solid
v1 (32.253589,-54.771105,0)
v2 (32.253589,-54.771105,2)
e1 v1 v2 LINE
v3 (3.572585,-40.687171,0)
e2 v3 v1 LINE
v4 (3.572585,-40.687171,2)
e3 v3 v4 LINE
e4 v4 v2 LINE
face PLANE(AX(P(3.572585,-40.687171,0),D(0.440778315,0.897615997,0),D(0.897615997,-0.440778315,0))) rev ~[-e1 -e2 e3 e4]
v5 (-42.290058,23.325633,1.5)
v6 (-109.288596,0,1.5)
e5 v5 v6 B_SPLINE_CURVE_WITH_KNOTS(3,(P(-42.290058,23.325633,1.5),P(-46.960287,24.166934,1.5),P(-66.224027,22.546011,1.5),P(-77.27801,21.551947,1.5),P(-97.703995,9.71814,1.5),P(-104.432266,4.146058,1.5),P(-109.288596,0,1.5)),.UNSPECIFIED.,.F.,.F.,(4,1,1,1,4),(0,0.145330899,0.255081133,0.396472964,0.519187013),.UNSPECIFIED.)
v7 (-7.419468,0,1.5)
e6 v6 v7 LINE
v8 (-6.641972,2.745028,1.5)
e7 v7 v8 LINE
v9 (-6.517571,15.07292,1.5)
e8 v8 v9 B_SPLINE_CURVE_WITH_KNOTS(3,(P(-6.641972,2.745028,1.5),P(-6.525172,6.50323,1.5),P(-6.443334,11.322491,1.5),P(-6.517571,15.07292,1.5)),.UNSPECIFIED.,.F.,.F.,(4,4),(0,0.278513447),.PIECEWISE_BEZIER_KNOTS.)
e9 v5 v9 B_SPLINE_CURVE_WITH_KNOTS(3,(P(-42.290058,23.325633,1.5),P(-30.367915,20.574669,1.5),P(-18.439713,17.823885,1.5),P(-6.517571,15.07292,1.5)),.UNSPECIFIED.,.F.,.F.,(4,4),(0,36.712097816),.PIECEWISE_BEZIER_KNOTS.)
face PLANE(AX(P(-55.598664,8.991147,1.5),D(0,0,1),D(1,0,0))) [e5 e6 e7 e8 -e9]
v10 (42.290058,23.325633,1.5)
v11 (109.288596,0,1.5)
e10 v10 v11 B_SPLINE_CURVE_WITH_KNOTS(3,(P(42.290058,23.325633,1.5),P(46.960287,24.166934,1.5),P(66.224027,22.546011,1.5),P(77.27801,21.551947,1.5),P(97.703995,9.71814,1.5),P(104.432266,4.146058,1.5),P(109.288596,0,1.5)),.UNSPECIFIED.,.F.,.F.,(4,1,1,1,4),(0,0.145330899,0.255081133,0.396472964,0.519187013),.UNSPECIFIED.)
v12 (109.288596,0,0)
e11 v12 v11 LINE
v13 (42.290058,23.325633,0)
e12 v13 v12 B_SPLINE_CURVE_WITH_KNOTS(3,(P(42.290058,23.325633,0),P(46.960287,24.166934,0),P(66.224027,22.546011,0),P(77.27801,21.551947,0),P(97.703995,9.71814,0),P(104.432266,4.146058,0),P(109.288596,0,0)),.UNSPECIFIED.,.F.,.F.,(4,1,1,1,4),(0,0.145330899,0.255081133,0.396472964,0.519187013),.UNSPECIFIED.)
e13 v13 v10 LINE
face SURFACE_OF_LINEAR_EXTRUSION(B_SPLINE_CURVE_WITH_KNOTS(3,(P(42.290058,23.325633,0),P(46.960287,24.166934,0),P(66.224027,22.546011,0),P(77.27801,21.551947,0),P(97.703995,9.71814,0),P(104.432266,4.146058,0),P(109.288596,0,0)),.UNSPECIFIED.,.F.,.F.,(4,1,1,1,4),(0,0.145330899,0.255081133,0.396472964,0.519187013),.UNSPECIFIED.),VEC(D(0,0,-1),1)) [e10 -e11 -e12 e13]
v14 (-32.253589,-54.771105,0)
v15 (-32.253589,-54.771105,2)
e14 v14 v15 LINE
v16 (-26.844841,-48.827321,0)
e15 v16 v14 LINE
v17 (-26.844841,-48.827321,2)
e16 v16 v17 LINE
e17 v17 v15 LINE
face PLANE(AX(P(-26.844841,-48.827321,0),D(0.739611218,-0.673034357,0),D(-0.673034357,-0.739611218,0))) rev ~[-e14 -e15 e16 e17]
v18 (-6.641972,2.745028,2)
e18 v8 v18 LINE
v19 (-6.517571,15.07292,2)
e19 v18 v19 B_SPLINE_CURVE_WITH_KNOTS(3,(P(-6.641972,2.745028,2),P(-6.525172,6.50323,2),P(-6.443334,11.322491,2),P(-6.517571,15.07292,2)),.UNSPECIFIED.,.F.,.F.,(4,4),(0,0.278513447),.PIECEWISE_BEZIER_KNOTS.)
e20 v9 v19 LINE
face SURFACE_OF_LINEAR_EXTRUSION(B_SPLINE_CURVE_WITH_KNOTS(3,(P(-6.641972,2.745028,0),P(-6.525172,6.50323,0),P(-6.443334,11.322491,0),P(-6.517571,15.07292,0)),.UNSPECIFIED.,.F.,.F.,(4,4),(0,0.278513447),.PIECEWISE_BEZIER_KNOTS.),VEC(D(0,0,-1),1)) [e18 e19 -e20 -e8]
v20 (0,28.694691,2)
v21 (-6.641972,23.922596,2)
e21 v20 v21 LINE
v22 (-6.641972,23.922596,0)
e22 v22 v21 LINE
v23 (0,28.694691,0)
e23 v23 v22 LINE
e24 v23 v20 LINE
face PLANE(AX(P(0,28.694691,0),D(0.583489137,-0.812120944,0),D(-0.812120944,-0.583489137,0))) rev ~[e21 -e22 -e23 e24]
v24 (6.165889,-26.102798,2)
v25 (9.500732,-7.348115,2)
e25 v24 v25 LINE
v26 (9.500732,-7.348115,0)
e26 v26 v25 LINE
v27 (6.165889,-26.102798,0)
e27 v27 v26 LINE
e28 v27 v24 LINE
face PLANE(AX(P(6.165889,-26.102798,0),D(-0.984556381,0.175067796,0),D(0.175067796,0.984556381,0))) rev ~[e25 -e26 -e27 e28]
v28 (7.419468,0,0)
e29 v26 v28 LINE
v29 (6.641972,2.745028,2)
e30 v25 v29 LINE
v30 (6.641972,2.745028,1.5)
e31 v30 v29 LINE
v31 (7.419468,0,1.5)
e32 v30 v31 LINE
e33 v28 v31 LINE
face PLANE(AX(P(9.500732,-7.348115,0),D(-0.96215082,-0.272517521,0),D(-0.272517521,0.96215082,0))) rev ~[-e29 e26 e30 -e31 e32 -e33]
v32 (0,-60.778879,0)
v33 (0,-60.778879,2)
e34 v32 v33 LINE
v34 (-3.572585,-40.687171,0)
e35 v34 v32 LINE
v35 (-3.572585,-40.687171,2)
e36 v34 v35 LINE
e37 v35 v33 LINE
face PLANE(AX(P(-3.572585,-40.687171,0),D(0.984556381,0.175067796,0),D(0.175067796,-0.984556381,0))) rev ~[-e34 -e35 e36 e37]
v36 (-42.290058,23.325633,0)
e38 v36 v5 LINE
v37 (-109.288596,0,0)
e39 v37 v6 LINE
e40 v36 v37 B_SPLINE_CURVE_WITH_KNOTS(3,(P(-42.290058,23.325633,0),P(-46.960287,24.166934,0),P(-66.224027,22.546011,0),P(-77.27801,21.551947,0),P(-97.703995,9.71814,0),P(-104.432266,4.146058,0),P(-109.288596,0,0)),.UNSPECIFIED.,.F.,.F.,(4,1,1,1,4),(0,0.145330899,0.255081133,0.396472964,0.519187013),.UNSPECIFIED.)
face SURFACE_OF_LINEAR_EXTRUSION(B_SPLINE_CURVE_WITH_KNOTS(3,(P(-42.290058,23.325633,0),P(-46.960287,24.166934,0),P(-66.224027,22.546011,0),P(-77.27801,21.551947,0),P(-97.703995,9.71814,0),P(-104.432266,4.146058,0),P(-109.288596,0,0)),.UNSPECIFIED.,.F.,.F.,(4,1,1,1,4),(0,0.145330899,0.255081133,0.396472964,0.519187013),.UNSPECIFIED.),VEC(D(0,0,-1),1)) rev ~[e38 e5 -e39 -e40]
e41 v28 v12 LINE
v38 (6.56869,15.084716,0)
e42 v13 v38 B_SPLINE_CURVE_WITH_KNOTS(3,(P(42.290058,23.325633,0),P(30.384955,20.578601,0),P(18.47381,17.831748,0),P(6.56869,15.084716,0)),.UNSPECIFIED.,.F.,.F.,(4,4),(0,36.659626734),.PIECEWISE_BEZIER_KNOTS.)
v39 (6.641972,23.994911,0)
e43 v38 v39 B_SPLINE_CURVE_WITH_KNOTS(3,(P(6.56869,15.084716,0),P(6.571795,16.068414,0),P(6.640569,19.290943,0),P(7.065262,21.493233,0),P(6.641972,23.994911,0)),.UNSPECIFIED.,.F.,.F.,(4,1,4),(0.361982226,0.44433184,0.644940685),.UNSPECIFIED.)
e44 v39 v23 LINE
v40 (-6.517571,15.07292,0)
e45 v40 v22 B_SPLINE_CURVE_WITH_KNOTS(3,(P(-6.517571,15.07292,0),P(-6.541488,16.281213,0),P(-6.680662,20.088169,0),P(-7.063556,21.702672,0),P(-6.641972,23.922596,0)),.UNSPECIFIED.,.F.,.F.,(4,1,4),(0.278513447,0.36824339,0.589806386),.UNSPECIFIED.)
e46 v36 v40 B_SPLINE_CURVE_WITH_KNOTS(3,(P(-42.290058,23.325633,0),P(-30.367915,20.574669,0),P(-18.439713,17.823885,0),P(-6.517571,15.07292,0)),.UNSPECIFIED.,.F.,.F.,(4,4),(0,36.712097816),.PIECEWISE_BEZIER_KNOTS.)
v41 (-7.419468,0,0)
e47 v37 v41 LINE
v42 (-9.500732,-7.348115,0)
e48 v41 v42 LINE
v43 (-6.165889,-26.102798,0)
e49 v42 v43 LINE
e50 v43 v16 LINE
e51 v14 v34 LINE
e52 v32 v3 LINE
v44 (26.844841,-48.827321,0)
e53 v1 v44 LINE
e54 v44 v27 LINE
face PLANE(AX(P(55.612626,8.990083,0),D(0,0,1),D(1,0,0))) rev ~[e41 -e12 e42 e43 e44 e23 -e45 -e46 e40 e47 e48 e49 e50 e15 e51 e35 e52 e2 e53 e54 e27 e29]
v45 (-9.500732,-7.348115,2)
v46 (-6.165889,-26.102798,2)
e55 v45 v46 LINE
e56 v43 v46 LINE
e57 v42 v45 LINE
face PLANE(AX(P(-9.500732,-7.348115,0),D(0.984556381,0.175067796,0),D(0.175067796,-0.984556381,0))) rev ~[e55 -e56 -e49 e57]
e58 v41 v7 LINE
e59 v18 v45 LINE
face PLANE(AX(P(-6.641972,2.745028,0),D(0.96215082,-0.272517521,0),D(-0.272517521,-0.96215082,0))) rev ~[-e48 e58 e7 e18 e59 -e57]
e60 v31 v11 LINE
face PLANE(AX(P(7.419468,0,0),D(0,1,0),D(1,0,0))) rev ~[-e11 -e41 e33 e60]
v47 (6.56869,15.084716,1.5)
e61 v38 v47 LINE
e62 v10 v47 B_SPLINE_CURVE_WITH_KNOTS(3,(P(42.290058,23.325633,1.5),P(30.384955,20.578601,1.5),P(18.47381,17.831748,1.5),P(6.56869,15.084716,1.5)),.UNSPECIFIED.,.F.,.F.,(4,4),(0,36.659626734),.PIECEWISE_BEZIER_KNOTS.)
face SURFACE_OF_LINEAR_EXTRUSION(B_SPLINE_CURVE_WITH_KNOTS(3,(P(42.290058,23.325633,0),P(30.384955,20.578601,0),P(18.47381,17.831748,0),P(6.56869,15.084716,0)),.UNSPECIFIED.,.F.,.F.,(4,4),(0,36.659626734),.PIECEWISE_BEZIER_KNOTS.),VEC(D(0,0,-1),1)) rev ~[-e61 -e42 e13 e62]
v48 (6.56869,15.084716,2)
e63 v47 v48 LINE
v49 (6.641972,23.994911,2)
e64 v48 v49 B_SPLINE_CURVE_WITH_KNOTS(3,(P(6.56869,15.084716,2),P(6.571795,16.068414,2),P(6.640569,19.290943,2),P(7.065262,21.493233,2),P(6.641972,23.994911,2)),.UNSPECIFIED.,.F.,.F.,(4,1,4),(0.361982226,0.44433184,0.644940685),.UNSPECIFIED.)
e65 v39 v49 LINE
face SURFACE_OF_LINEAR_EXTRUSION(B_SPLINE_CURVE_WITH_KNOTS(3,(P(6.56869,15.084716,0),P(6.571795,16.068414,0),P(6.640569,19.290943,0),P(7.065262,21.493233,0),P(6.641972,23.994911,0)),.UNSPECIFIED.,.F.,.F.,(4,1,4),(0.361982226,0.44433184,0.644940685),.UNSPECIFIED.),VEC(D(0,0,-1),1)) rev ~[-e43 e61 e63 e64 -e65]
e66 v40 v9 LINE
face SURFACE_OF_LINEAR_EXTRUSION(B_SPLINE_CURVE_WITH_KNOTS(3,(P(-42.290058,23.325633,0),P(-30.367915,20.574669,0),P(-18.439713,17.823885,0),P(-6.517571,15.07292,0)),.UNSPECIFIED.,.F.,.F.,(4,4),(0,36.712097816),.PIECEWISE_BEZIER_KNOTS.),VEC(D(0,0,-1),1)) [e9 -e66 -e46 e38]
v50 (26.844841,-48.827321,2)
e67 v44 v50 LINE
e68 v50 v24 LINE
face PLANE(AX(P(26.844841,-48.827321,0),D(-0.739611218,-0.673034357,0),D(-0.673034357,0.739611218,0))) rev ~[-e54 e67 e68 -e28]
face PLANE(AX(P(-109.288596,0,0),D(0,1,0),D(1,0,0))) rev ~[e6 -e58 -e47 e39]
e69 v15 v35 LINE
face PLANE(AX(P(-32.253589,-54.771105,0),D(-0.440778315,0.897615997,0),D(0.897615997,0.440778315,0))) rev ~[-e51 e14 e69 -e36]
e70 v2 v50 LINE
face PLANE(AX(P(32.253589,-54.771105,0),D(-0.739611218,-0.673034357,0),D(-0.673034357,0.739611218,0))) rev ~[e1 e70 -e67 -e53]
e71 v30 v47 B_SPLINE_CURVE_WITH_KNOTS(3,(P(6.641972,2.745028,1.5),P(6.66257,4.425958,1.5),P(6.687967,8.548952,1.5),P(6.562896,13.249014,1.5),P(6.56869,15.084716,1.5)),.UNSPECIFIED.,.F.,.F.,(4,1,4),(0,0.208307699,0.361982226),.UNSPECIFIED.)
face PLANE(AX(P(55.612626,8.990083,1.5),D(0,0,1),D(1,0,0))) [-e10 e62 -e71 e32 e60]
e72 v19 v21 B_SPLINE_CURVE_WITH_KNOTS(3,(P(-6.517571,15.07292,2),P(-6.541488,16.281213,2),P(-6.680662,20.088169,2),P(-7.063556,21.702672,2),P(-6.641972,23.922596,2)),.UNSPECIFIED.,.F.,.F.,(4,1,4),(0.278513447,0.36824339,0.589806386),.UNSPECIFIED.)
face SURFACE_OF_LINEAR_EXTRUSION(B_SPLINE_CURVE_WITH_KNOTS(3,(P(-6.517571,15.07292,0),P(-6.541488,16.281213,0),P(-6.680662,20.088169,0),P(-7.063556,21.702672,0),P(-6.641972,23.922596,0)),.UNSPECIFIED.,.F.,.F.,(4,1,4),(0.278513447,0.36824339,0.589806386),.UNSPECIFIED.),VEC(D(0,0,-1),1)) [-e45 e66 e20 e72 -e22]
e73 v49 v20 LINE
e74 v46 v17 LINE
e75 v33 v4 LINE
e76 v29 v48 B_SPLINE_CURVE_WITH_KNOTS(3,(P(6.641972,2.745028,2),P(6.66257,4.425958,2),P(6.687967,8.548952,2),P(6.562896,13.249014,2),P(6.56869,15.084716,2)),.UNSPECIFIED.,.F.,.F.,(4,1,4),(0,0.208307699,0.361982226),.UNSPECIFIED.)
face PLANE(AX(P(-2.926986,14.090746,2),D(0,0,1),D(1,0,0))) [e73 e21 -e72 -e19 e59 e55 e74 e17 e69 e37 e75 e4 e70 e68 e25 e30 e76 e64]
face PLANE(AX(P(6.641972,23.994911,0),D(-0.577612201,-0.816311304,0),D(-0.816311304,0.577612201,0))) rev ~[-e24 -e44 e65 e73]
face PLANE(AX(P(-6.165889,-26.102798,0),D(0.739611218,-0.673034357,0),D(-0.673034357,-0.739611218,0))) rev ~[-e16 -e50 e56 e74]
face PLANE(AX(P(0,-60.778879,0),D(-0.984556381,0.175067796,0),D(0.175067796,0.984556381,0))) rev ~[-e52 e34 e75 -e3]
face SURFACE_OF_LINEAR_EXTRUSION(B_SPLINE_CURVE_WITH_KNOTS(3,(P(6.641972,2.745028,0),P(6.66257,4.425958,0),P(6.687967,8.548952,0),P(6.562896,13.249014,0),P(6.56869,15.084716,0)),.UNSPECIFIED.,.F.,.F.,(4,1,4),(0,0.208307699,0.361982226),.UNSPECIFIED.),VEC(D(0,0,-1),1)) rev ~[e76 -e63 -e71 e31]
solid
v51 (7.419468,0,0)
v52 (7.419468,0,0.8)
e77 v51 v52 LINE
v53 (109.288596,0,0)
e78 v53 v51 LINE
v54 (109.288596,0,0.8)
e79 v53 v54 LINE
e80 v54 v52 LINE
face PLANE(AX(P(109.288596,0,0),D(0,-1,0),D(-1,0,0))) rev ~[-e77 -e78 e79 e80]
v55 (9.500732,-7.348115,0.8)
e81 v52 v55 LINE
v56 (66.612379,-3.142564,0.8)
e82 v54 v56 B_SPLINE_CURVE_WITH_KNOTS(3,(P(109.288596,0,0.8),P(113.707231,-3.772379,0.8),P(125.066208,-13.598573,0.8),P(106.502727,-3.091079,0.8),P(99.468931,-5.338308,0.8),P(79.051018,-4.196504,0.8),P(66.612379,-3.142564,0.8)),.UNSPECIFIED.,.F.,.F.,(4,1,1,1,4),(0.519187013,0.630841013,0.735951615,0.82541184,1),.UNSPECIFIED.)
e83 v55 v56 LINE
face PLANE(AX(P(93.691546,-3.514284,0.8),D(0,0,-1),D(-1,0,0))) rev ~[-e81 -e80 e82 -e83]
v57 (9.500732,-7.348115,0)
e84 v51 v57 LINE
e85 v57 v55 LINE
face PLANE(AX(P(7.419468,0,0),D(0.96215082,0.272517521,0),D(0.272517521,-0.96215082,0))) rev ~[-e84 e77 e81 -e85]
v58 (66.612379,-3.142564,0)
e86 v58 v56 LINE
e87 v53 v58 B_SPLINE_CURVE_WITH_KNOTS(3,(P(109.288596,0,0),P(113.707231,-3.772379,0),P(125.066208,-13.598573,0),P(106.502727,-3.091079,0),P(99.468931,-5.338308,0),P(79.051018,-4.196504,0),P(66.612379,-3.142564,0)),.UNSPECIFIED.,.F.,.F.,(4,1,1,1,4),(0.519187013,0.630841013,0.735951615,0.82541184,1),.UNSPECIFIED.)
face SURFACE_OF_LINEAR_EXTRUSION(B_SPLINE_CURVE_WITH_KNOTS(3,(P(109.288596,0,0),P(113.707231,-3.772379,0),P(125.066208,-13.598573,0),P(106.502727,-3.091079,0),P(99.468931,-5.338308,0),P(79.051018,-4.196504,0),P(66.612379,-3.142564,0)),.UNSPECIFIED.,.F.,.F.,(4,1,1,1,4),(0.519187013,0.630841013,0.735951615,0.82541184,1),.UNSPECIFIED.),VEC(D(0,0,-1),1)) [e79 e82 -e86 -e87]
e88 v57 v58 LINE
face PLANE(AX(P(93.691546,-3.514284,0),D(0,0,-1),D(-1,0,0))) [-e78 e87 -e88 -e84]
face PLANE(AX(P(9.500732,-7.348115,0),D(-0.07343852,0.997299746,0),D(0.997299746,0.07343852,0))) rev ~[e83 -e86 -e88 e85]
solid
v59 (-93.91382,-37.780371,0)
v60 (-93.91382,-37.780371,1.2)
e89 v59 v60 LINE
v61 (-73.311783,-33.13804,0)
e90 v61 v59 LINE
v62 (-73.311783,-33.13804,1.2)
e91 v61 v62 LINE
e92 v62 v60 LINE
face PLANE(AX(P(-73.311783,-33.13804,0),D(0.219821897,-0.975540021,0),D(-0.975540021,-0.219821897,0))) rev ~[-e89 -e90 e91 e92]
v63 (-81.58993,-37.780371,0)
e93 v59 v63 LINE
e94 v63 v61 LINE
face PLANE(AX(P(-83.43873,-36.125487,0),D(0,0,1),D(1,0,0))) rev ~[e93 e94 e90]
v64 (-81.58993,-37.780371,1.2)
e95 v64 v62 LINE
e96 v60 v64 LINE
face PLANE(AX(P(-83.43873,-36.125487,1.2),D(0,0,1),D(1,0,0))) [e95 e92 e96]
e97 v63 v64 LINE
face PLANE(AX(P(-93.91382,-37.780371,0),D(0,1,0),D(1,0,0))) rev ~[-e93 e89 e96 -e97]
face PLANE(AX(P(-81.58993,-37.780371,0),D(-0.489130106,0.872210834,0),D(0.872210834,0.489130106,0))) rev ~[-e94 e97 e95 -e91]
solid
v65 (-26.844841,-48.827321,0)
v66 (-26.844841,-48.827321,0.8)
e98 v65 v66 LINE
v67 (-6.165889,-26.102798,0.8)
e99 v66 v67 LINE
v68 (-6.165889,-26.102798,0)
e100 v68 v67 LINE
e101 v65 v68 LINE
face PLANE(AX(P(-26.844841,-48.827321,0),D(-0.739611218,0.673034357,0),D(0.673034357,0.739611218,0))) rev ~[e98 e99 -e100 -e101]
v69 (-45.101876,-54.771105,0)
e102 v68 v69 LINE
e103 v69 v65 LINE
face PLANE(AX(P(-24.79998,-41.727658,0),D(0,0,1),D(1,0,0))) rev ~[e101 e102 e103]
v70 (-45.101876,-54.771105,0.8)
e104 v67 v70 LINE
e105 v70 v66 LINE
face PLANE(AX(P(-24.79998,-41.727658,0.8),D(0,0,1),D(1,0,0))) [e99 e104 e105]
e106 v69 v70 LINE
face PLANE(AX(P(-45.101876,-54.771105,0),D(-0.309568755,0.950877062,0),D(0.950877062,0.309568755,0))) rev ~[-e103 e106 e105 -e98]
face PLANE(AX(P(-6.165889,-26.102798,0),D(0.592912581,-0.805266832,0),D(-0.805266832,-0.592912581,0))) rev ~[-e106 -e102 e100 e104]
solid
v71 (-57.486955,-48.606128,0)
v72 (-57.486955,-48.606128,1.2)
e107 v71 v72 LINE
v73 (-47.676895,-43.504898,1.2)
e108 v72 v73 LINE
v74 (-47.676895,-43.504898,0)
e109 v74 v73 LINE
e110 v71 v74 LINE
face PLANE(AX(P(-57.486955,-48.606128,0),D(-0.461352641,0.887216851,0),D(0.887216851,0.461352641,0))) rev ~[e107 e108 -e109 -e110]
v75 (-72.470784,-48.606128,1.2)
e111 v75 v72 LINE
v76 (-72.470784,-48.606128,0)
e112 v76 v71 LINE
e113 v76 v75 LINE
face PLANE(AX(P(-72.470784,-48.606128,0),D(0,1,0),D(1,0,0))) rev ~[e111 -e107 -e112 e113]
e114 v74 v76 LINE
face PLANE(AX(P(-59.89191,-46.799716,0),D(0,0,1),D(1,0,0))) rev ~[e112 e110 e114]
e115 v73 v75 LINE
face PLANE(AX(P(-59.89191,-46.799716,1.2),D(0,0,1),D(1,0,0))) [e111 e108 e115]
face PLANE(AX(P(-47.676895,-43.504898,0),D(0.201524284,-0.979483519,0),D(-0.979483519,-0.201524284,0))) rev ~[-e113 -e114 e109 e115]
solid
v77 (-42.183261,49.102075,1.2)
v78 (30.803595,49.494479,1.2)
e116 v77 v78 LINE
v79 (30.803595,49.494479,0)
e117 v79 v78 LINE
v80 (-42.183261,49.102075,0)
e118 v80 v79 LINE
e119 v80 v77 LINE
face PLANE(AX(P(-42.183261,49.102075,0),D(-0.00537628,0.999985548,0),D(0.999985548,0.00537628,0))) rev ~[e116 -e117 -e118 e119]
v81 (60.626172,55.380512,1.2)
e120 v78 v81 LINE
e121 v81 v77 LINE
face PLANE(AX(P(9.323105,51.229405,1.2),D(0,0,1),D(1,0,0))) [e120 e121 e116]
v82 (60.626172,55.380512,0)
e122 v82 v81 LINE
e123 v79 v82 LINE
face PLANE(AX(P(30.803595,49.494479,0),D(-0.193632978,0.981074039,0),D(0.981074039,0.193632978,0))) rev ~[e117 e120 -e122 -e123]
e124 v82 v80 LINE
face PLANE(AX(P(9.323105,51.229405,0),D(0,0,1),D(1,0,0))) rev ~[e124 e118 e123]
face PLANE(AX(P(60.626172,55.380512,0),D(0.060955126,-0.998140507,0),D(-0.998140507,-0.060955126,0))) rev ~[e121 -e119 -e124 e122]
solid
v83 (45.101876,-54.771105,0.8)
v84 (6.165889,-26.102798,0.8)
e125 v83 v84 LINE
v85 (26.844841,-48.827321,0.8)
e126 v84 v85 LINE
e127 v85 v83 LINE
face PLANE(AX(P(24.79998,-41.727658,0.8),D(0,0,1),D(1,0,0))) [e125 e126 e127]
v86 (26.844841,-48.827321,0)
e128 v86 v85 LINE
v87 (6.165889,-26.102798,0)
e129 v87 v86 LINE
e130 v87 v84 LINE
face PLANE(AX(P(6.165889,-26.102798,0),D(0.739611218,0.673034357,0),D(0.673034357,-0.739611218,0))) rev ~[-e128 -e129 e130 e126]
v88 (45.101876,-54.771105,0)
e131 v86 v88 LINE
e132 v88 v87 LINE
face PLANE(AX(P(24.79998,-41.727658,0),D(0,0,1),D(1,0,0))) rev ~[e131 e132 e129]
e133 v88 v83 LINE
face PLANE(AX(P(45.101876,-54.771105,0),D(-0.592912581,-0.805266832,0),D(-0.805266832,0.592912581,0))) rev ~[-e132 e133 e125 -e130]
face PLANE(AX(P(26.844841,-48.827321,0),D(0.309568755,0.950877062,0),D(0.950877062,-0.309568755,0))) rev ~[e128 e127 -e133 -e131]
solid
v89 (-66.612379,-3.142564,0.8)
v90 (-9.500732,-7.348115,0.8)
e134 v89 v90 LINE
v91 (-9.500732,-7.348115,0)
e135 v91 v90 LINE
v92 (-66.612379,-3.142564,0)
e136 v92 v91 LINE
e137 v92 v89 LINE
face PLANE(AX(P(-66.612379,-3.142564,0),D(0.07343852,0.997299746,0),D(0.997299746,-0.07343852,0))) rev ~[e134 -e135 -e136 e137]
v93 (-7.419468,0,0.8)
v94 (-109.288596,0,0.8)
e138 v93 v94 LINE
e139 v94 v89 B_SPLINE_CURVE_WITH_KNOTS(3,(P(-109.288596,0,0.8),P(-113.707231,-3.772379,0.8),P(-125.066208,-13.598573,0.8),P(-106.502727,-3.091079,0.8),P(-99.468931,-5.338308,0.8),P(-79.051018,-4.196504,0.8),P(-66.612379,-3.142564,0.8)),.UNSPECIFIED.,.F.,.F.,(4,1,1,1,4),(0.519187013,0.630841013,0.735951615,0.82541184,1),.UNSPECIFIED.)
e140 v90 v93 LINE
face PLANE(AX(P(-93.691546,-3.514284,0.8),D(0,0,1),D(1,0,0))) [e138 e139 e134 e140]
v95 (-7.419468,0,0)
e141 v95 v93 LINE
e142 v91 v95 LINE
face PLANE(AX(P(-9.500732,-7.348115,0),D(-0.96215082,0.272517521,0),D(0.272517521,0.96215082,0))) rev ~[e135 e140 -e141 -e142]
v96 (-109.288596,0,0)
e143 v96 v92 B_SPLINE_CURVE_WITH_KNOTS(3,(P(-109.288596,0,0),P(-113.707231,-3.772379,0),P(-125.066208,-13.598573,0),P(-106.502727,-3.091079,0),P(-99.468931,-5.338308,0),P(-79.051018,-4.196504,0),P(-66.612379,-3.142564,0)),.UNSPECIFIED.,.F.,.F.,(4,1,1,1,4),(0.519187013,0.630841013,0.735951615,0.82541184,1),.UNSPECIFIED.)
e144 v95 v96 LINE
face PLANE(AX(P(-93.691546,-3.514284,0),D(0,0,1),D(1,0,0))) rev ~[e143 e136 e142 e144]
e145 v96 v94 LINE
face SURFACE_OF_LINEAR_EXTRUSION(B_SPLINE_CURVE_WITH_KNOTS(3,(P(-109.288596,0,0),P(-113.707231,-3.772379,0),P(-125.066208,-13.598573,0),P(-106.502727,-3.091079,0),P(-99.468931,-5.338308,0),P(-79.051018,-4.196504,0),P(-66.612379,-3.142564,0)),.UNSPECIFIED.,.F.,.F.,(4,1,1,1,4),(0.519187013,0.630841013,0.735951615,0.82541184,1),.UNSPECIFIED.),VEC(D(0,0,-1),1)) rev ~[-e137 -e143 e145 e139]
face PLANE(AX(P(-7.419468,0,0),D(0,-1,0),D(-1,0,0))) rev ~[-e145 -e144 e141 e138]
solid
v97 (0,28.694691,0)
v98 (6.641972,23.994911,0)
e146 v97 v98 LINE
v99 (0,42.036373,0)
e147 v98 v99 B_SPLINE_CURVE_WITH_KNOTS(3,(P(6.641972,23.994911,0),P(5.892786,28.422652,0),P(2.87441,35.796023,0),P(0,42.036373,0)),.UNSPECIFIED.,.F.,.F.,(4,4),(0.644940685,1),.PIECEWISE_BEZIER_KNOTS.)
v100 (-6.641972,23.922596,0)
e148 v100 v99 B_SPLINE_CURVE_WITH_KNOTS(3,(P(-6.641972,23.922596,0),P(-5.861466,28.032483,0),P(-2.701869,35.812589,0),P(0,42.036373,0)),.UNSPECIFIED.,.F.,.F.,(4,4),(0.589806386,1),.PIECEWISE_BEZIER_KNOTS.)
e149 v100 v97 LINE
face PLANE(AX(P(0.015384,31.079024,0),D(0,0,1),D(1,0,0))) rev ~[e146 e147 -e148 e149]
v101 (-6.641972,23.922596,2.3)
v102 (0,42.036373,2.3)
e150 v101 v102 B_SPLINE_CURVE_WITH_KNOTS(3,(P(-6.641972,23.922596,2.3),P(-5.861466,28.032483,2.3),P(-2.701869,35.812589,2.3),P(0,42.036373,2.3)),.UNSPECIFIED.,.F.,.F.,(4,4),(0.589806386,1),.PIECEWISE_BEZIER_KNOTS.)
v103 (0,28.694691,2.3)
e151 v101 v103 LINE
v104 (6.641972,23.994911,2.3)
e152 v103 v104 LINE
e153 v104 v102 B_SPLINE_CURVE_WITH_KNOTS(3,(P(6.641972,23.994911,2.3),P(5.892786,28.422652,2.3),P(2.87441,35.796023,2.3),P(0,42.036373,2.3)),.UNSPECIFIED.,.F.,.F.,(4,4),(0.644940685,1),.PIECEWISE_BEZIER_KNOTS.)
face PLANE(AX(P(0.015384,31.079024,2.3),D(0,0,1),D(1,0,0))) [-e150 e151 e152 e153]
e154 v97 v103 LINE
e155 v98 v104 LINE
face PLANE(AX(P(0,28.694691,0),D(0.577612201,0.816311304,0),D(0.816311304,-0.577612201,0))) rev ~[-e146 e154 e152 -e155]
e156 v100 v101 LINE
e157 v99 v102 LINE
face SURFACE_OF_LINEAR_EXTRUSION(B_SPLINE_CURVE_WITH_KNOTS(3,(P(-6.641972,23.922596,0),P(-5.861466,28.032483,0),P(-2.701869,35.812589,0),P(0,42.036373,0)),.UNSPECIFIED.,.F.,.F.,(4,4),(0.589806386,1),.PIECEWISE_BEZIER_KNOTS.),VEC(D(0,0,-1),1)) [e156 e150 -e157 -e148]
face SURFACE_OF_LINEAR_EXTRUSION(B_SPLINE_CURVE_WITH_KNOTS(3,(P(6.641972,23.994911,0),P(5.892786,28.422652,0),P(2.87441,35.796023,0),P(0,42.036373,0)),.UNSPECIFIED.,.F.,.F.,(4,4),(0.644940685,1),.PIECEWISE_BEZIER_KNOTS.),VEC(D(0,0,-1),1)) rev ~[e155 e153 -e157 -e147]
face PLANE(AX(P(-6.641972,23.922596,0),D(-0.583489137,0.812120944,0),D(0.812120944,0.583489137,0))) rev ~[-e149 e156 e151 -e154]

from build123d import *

# Parameters (mm, degrees)
F1_DEPTH = 2
F2_DEPTH = 2.3
F3_DEPTH = 1.5
F4_DEPTH = 0.8
F5_DEPTH = 1.2


# Not quite as in the source:
# - a feature names something its author has since deleted; it is built from what else it names


with BuildPart() as f1:
    # F0 (on Top) → F1 (new body)
    with BuildSketch(Plane.XY):
        with BuildLine():
            Line((-6.6419716499, 2.745028284), (0, 0))
            Line((0, 0), (0, 28.6946911365))
            Line((0, 28.6946911365), (-6.6419716499, 23.9225961235))
            add(Edge.make_bspline(
                [(-6.5175706139, 15.0729201773), (-6.5414876506, 16.2812130784), (-6.6806623081, 20.0881688925), (-7.0635559844, 21.7026716796), (-6.6419716499, 23.9225961235)],
                knots=[0.2785134471, 0.2785134471, 0.2785134471, 0.2785134471, 0.3682433903, 0.5898063865, 0.5898063865, 0.5898063865, 0.5898063865], degree=3))
            add(Edge.make_bspline(
                [(-6.6419716499, 2.745028284), (-6.5251722943, 6.5032297687), (-6.4433343436, 11.3224907311), (-6.5175706139, 15.0729201773)],
                knots=[0, 0, 0, 0, 0.2785134471, 0.2785134471, 0.2785134471, 0.2785134471], degree=3))
        make_face()
        with BuildLine():
            Line((0, 28.6946911365), (0, 0))
            Line((0, 0), (6.6419716499, 2.745028284))
            add(Edge.make_bspline(
                [(6.6419716499, 2.745028284), (6.6625704877, 4.4259580865), (6.6879671442, 8.5489520633), (6.5628964948, 13.2490139748), (6.5686901265, 15.0847156957)],
                knots=[0, 0, 0, 0, 0.2083076988, 0.3619822263, 0.3619822263, 0.3619822263, 0.3619822263], degree=3))
            add(Edge.make_bspline(
                [(6.5686901265, 15.0847156957), (6.5717947616, 16.0684137089), (6.6405692543, 19.2909426976), (7.065262223, 21.4932328604), (6.6419716499, 23.9949107423)],
                knots=[0.3619822263, 0.3619822263, 0.3619822263, 0.3619822263, 0.4443318399, 0.644940685, 0.644940685, 0.644940685, 0.644940685], degree=3))
            Line((6.6419716499, 23.9949107423), (0, 28.6946911365))
        make_face()
        Polygon((9.5007317222, -7.3481148503), (0, -8.0477236517), (0, -38.9328375459), (3.5725845946, -40.6871710497), (6.1658886261, -26.1027980596), align=None)
        Polygon((0, -38.9328375459), (0, -8.0477236517), (-9.5007317222, -7.3481148503), (-6.1658886261, -26.1027980596), (-3.5725845946, -40.6871710497), align=None)
        Polygon((-32.2535888602, -54.7711053479), (-3.5725845946, -40.6871710497), (-6.1658886261, -26.1027980596), (-26.8448407595, -48.8273214495), align=None)
        Polygon((26.8448407595, -48.8273214495), (6.1658886261, -26.1027980596), (3.5725845946, -40.6871710497), (32.2535888602, -54.7711053479), align=None)
        Polygon((0, -8.0477236517), (0, 0), (-7.4194675351, 0), (-9.5007317222, -7.3481148503), align=None)
        Polygon((7.4194675351, 0), (0, 0), (0, -8.0477236517), (9.5007317222, -7.3481148503), align=None)
        Polygon((6.6419716499, 2.745028284), (0, 0), (7.4194675351, 0), align=None)
        Polygon((-7.4194675351, 0), (0, 0), (-6.6419716499, 2.745028284), align=None)
        Polygon((3.5725845946, -40.6871710497), (0, -38.9328375459), (-3.5725845946, -40.6871710497), (0, -60.7788786292), align=None)
    extrude(amount=F1_DEPTH)

    # F0 (on Top) → F3 (join)
    with BuildSketch(Plane.XY):
        with BuildLine():
            Line((6.6419716499, 2.745028284), (7.4194675351, 0))
            Line((7.4194675351, 0), (109.2885956168, 0))
            add(Edge.make_bspline(
                [(42.290057987, 23.3256332576), (46.9602869466, 24.1669337854), (66.2240272129, 22.5460111833), (77.2780101126, 21.5519474786), (97.7039953696, 9.7181396105), (104.4322660293, 4.1460579818), (109.2885956168, 0)],
                knots=[0, 0, 0, 0, 0.1453308986, 0.2550811327, 0.396472964, 0.5191870129, 0.5191870129, 0.5191870129, 0.5191870129], degree=3))
            add(Edge.make_bspline(
                [(42.290057987, 23.3256332576), (30.384955122, 20.5786005266), (18.4738102627, 17.8317479119), (6.5686901266, 15.0847156956)],
                knots=[0, 0, 0, 0, 36.6596267337, 36.6596267337, 36.6596267337, 36.6596267337], degree=3))
            add(Edge.make_bspline(
                [(6.6419716499, 2.745028284), (6.6625704877, 4.4259580865), (6.6879671442, 8.5489520633), (6.5628964948, 13.2490139748), (6.5686901265, 15.0847156957)],
                knots=[0, 0, 0, 0, 0.2083076988, 0.3619822263, 0.3619822263, 0.3619822263, 0.3619822263], degree=3))
        make_face()
        with BuildLine():
            Line((-109.2885956168, 0), (-7.4194675351, 0))
            Line((-7.4194675351, 0), (-6.6419716499, 2.745028284))
            add(Edge.make_bspline(
                [(-6.6419716499, 2.745028284), (-6.5251722943, 6.5032297687), (-6.4433343436, 11.3224907311), (-6.5175706139, 15.0729201773)],
                knots=[0, 0, 0, 0, 0.2785134471, 0.2785134471, 0.2785134471, 0.2785134471], degree=3))
            add(Edge.make_bspline(
                [(-42.290057987, 23.3256332576), (-30.3679152969, 20.5746686867), (-18.4397133041, 17.8238847482), (-6.5175706139, 15.0729201773)],
                knots=[0, 0, 0, 0, 36.7120978158, 36.7120978158, 36.7120978158, 36.7120978158], degree=3))
            add(Edge.make_bspline(
                [(-42.290057987, 23.3256332576), (-46.9602869466, 24.1669337854), (-66.2240272129, 22.5460111833), (-77.2780101126, 21.5519474786), (-97.7039953696, 9.7181396105), (-104.4322660293, 4.1460579818), (-109.2885956168, 0)],
                knots=[0, 0, 0, 0, 0.1453308986, 0.2550811327, 0.396472964, 0.5191870129, 0.5191870129, 0.5191870129, 0.5191870129], degree=3))
        make_face()
    extrude(amount=F3_DEPTH)


with BuildPart() as f2:
    # F0 (on Top) → F2 (new body)
    with BuildSketch(Plane.XY):
        with BuildLine():
            Line((-6.6419716499, 23.9225961235), (0, 28.6946911365))
            Line((0, 28.6946911365), (6.6419716499, 23.9949107423))
            add(Edge.make_bspline(
                [(6.6419716499, 23.9949107423), (5.892786035, 28.4226518758), (2.8744096347, 35.7960231207), (0, 42.0363731682)],
                knots=[0.644940685, 0.644940685, 0.644940685, 0.644940685, 1, 1, 1, 1], degree=3))
            add(Edge.make_bspline(
                [(-6.6419716499, 23.9225961235), (-5.8614658592, 28.032482904), (-2.70186861, 35.812589021), (0, 42.0363731682)],
                knots=[0.5898063865, 0.5898063865, 0.5898063865, 0.5898063865, 1, 1, 1, 1], degree=3))
        make_face()
    extrude(amount=F2_DEPTH)


with BuildPart() as f4:
    # F0 (on Top) → F4 (new body)
    with BuildSketch(Plane.XY):
        with BuildLine():
            Line((-66.6123788172, -3.1425639369), (-109.2885956168, 0))
            add(Edge.make_bspline(
                [(-109.2885956168, 0), (-113.7072309048, -3.7723794842), (-125.0662078985, -13.5985728633), (-106.5027266596, -3.0910792348), (-99.4689310801, -5.3383077024), (-79.0510181663, -4.1965041845), (-66.6123788172, -3.1425639369)],
                knots=[0.5191870129, 0.5191870129, 0.5191870129, 0.5191870129, 0.6308410134, 0.7359516151, 0.8254118404, 1, 1, 1, 1], degree=3))
        make_face()
        Polygon((-9.5007317222, -7.3481148503), (-7.4194675351, 0), (-109.2885956168, 0), (-66.6123788172, -3.1425639369), align=None)
    extrude(amount=F4_DEPTH)


with BuildPart() as f4b:
    # F0 (on Top) → F4, piece 2 (new body)
    with BuildSketch(Plane.XY):
        with BuildLine():
            add(Edge.make_bspline(
                [(109.2885956168, 0), (113.7072309048, -3.7723794842), (125.0662078985, -13.5985728633), (106.5027266596, -3.0910792348), (99.4689310801, -5.3383077024), (79.0510181663, -4.1965041845), (66.6123788172, -3.1425639369)],
                knots=[0.5191870129, 0.5191870129, 0.5191870129, 0.5191870129, 0.6308410134, 0.7359516151, 0.8254118404, 1, 1, 1, 1], degree=3))
            Line((109.2885956168, 0), (66.6123788172, -3.1425639369))
        make_face()
        Polygon((109.2885956168, 0), (7.4194675351, 0), (9.5007317222, -7.3481148503), (66.6123788172, -3.1425639369), align=None)
    extrude(amount=F4_DEPTH)


with BuildPart() as f4c:
    # F0 (on Top) → F4, piece 3 (new body)
    with BuildSketch(Plane.XY):
        Polygon((-26.8448407595, -48.8273214495), (-6.1658886261, -26.1027980596), (-45.1018763415, -54.7711053479), align=None)
    extrude(amount=F4_DEPTH)


with BuildPart() as f4d:
    # F0 (on Top) → F4, piece 4 (new body)
    with BuildSketch(Plane.XY):
        Polygon((45.1018763415, -54.7711053479), (6.1658886261, -26.1027980596), (26.8448407595, -48.8273214495), align=None)
    extrude(amount=F4_DEPTH)


with BuildPart() as f5:
    # F0 (on Top) → F5 (new body)
    with BuildSketch(Plane.XY):
        Polygon((-73.3117833734, -33.1380404532), (-93.9138201779, -37.7803705633), (-81.5899297595, -37.7803705633), align=None)
    extrude(amount=F5_DEPTH)


with BuildPart() as f5b:
    # F0 (on Top) → F5, piece 2 (new body)
    with BuildSketch(Plane.XY):
        Polygon((60.6261715293, 55.3805120289), (-42.1832613647, 49.102075398), (30.8035947382, 49.4944788516), align=None)
    extrude(amount=F5_DEPTH)


with BuildPart() as f5c:
    # F0 (on Top) → F5, piece 3 (new body)
    with BuildSketch(Plane.XY):
        Polygon((-47.6768948138, -43.504897505), (-72.4707837196, -48.6061275005), (-57.4869550765, -48.6061275005), align=None)
    extrude(amount=F5_DEPTH)


solid = Compound([f1.part, f2.part, f4.part, f4b.part, f4c.part, f4d.part, f5.part, f5b.part, f5c.part])
